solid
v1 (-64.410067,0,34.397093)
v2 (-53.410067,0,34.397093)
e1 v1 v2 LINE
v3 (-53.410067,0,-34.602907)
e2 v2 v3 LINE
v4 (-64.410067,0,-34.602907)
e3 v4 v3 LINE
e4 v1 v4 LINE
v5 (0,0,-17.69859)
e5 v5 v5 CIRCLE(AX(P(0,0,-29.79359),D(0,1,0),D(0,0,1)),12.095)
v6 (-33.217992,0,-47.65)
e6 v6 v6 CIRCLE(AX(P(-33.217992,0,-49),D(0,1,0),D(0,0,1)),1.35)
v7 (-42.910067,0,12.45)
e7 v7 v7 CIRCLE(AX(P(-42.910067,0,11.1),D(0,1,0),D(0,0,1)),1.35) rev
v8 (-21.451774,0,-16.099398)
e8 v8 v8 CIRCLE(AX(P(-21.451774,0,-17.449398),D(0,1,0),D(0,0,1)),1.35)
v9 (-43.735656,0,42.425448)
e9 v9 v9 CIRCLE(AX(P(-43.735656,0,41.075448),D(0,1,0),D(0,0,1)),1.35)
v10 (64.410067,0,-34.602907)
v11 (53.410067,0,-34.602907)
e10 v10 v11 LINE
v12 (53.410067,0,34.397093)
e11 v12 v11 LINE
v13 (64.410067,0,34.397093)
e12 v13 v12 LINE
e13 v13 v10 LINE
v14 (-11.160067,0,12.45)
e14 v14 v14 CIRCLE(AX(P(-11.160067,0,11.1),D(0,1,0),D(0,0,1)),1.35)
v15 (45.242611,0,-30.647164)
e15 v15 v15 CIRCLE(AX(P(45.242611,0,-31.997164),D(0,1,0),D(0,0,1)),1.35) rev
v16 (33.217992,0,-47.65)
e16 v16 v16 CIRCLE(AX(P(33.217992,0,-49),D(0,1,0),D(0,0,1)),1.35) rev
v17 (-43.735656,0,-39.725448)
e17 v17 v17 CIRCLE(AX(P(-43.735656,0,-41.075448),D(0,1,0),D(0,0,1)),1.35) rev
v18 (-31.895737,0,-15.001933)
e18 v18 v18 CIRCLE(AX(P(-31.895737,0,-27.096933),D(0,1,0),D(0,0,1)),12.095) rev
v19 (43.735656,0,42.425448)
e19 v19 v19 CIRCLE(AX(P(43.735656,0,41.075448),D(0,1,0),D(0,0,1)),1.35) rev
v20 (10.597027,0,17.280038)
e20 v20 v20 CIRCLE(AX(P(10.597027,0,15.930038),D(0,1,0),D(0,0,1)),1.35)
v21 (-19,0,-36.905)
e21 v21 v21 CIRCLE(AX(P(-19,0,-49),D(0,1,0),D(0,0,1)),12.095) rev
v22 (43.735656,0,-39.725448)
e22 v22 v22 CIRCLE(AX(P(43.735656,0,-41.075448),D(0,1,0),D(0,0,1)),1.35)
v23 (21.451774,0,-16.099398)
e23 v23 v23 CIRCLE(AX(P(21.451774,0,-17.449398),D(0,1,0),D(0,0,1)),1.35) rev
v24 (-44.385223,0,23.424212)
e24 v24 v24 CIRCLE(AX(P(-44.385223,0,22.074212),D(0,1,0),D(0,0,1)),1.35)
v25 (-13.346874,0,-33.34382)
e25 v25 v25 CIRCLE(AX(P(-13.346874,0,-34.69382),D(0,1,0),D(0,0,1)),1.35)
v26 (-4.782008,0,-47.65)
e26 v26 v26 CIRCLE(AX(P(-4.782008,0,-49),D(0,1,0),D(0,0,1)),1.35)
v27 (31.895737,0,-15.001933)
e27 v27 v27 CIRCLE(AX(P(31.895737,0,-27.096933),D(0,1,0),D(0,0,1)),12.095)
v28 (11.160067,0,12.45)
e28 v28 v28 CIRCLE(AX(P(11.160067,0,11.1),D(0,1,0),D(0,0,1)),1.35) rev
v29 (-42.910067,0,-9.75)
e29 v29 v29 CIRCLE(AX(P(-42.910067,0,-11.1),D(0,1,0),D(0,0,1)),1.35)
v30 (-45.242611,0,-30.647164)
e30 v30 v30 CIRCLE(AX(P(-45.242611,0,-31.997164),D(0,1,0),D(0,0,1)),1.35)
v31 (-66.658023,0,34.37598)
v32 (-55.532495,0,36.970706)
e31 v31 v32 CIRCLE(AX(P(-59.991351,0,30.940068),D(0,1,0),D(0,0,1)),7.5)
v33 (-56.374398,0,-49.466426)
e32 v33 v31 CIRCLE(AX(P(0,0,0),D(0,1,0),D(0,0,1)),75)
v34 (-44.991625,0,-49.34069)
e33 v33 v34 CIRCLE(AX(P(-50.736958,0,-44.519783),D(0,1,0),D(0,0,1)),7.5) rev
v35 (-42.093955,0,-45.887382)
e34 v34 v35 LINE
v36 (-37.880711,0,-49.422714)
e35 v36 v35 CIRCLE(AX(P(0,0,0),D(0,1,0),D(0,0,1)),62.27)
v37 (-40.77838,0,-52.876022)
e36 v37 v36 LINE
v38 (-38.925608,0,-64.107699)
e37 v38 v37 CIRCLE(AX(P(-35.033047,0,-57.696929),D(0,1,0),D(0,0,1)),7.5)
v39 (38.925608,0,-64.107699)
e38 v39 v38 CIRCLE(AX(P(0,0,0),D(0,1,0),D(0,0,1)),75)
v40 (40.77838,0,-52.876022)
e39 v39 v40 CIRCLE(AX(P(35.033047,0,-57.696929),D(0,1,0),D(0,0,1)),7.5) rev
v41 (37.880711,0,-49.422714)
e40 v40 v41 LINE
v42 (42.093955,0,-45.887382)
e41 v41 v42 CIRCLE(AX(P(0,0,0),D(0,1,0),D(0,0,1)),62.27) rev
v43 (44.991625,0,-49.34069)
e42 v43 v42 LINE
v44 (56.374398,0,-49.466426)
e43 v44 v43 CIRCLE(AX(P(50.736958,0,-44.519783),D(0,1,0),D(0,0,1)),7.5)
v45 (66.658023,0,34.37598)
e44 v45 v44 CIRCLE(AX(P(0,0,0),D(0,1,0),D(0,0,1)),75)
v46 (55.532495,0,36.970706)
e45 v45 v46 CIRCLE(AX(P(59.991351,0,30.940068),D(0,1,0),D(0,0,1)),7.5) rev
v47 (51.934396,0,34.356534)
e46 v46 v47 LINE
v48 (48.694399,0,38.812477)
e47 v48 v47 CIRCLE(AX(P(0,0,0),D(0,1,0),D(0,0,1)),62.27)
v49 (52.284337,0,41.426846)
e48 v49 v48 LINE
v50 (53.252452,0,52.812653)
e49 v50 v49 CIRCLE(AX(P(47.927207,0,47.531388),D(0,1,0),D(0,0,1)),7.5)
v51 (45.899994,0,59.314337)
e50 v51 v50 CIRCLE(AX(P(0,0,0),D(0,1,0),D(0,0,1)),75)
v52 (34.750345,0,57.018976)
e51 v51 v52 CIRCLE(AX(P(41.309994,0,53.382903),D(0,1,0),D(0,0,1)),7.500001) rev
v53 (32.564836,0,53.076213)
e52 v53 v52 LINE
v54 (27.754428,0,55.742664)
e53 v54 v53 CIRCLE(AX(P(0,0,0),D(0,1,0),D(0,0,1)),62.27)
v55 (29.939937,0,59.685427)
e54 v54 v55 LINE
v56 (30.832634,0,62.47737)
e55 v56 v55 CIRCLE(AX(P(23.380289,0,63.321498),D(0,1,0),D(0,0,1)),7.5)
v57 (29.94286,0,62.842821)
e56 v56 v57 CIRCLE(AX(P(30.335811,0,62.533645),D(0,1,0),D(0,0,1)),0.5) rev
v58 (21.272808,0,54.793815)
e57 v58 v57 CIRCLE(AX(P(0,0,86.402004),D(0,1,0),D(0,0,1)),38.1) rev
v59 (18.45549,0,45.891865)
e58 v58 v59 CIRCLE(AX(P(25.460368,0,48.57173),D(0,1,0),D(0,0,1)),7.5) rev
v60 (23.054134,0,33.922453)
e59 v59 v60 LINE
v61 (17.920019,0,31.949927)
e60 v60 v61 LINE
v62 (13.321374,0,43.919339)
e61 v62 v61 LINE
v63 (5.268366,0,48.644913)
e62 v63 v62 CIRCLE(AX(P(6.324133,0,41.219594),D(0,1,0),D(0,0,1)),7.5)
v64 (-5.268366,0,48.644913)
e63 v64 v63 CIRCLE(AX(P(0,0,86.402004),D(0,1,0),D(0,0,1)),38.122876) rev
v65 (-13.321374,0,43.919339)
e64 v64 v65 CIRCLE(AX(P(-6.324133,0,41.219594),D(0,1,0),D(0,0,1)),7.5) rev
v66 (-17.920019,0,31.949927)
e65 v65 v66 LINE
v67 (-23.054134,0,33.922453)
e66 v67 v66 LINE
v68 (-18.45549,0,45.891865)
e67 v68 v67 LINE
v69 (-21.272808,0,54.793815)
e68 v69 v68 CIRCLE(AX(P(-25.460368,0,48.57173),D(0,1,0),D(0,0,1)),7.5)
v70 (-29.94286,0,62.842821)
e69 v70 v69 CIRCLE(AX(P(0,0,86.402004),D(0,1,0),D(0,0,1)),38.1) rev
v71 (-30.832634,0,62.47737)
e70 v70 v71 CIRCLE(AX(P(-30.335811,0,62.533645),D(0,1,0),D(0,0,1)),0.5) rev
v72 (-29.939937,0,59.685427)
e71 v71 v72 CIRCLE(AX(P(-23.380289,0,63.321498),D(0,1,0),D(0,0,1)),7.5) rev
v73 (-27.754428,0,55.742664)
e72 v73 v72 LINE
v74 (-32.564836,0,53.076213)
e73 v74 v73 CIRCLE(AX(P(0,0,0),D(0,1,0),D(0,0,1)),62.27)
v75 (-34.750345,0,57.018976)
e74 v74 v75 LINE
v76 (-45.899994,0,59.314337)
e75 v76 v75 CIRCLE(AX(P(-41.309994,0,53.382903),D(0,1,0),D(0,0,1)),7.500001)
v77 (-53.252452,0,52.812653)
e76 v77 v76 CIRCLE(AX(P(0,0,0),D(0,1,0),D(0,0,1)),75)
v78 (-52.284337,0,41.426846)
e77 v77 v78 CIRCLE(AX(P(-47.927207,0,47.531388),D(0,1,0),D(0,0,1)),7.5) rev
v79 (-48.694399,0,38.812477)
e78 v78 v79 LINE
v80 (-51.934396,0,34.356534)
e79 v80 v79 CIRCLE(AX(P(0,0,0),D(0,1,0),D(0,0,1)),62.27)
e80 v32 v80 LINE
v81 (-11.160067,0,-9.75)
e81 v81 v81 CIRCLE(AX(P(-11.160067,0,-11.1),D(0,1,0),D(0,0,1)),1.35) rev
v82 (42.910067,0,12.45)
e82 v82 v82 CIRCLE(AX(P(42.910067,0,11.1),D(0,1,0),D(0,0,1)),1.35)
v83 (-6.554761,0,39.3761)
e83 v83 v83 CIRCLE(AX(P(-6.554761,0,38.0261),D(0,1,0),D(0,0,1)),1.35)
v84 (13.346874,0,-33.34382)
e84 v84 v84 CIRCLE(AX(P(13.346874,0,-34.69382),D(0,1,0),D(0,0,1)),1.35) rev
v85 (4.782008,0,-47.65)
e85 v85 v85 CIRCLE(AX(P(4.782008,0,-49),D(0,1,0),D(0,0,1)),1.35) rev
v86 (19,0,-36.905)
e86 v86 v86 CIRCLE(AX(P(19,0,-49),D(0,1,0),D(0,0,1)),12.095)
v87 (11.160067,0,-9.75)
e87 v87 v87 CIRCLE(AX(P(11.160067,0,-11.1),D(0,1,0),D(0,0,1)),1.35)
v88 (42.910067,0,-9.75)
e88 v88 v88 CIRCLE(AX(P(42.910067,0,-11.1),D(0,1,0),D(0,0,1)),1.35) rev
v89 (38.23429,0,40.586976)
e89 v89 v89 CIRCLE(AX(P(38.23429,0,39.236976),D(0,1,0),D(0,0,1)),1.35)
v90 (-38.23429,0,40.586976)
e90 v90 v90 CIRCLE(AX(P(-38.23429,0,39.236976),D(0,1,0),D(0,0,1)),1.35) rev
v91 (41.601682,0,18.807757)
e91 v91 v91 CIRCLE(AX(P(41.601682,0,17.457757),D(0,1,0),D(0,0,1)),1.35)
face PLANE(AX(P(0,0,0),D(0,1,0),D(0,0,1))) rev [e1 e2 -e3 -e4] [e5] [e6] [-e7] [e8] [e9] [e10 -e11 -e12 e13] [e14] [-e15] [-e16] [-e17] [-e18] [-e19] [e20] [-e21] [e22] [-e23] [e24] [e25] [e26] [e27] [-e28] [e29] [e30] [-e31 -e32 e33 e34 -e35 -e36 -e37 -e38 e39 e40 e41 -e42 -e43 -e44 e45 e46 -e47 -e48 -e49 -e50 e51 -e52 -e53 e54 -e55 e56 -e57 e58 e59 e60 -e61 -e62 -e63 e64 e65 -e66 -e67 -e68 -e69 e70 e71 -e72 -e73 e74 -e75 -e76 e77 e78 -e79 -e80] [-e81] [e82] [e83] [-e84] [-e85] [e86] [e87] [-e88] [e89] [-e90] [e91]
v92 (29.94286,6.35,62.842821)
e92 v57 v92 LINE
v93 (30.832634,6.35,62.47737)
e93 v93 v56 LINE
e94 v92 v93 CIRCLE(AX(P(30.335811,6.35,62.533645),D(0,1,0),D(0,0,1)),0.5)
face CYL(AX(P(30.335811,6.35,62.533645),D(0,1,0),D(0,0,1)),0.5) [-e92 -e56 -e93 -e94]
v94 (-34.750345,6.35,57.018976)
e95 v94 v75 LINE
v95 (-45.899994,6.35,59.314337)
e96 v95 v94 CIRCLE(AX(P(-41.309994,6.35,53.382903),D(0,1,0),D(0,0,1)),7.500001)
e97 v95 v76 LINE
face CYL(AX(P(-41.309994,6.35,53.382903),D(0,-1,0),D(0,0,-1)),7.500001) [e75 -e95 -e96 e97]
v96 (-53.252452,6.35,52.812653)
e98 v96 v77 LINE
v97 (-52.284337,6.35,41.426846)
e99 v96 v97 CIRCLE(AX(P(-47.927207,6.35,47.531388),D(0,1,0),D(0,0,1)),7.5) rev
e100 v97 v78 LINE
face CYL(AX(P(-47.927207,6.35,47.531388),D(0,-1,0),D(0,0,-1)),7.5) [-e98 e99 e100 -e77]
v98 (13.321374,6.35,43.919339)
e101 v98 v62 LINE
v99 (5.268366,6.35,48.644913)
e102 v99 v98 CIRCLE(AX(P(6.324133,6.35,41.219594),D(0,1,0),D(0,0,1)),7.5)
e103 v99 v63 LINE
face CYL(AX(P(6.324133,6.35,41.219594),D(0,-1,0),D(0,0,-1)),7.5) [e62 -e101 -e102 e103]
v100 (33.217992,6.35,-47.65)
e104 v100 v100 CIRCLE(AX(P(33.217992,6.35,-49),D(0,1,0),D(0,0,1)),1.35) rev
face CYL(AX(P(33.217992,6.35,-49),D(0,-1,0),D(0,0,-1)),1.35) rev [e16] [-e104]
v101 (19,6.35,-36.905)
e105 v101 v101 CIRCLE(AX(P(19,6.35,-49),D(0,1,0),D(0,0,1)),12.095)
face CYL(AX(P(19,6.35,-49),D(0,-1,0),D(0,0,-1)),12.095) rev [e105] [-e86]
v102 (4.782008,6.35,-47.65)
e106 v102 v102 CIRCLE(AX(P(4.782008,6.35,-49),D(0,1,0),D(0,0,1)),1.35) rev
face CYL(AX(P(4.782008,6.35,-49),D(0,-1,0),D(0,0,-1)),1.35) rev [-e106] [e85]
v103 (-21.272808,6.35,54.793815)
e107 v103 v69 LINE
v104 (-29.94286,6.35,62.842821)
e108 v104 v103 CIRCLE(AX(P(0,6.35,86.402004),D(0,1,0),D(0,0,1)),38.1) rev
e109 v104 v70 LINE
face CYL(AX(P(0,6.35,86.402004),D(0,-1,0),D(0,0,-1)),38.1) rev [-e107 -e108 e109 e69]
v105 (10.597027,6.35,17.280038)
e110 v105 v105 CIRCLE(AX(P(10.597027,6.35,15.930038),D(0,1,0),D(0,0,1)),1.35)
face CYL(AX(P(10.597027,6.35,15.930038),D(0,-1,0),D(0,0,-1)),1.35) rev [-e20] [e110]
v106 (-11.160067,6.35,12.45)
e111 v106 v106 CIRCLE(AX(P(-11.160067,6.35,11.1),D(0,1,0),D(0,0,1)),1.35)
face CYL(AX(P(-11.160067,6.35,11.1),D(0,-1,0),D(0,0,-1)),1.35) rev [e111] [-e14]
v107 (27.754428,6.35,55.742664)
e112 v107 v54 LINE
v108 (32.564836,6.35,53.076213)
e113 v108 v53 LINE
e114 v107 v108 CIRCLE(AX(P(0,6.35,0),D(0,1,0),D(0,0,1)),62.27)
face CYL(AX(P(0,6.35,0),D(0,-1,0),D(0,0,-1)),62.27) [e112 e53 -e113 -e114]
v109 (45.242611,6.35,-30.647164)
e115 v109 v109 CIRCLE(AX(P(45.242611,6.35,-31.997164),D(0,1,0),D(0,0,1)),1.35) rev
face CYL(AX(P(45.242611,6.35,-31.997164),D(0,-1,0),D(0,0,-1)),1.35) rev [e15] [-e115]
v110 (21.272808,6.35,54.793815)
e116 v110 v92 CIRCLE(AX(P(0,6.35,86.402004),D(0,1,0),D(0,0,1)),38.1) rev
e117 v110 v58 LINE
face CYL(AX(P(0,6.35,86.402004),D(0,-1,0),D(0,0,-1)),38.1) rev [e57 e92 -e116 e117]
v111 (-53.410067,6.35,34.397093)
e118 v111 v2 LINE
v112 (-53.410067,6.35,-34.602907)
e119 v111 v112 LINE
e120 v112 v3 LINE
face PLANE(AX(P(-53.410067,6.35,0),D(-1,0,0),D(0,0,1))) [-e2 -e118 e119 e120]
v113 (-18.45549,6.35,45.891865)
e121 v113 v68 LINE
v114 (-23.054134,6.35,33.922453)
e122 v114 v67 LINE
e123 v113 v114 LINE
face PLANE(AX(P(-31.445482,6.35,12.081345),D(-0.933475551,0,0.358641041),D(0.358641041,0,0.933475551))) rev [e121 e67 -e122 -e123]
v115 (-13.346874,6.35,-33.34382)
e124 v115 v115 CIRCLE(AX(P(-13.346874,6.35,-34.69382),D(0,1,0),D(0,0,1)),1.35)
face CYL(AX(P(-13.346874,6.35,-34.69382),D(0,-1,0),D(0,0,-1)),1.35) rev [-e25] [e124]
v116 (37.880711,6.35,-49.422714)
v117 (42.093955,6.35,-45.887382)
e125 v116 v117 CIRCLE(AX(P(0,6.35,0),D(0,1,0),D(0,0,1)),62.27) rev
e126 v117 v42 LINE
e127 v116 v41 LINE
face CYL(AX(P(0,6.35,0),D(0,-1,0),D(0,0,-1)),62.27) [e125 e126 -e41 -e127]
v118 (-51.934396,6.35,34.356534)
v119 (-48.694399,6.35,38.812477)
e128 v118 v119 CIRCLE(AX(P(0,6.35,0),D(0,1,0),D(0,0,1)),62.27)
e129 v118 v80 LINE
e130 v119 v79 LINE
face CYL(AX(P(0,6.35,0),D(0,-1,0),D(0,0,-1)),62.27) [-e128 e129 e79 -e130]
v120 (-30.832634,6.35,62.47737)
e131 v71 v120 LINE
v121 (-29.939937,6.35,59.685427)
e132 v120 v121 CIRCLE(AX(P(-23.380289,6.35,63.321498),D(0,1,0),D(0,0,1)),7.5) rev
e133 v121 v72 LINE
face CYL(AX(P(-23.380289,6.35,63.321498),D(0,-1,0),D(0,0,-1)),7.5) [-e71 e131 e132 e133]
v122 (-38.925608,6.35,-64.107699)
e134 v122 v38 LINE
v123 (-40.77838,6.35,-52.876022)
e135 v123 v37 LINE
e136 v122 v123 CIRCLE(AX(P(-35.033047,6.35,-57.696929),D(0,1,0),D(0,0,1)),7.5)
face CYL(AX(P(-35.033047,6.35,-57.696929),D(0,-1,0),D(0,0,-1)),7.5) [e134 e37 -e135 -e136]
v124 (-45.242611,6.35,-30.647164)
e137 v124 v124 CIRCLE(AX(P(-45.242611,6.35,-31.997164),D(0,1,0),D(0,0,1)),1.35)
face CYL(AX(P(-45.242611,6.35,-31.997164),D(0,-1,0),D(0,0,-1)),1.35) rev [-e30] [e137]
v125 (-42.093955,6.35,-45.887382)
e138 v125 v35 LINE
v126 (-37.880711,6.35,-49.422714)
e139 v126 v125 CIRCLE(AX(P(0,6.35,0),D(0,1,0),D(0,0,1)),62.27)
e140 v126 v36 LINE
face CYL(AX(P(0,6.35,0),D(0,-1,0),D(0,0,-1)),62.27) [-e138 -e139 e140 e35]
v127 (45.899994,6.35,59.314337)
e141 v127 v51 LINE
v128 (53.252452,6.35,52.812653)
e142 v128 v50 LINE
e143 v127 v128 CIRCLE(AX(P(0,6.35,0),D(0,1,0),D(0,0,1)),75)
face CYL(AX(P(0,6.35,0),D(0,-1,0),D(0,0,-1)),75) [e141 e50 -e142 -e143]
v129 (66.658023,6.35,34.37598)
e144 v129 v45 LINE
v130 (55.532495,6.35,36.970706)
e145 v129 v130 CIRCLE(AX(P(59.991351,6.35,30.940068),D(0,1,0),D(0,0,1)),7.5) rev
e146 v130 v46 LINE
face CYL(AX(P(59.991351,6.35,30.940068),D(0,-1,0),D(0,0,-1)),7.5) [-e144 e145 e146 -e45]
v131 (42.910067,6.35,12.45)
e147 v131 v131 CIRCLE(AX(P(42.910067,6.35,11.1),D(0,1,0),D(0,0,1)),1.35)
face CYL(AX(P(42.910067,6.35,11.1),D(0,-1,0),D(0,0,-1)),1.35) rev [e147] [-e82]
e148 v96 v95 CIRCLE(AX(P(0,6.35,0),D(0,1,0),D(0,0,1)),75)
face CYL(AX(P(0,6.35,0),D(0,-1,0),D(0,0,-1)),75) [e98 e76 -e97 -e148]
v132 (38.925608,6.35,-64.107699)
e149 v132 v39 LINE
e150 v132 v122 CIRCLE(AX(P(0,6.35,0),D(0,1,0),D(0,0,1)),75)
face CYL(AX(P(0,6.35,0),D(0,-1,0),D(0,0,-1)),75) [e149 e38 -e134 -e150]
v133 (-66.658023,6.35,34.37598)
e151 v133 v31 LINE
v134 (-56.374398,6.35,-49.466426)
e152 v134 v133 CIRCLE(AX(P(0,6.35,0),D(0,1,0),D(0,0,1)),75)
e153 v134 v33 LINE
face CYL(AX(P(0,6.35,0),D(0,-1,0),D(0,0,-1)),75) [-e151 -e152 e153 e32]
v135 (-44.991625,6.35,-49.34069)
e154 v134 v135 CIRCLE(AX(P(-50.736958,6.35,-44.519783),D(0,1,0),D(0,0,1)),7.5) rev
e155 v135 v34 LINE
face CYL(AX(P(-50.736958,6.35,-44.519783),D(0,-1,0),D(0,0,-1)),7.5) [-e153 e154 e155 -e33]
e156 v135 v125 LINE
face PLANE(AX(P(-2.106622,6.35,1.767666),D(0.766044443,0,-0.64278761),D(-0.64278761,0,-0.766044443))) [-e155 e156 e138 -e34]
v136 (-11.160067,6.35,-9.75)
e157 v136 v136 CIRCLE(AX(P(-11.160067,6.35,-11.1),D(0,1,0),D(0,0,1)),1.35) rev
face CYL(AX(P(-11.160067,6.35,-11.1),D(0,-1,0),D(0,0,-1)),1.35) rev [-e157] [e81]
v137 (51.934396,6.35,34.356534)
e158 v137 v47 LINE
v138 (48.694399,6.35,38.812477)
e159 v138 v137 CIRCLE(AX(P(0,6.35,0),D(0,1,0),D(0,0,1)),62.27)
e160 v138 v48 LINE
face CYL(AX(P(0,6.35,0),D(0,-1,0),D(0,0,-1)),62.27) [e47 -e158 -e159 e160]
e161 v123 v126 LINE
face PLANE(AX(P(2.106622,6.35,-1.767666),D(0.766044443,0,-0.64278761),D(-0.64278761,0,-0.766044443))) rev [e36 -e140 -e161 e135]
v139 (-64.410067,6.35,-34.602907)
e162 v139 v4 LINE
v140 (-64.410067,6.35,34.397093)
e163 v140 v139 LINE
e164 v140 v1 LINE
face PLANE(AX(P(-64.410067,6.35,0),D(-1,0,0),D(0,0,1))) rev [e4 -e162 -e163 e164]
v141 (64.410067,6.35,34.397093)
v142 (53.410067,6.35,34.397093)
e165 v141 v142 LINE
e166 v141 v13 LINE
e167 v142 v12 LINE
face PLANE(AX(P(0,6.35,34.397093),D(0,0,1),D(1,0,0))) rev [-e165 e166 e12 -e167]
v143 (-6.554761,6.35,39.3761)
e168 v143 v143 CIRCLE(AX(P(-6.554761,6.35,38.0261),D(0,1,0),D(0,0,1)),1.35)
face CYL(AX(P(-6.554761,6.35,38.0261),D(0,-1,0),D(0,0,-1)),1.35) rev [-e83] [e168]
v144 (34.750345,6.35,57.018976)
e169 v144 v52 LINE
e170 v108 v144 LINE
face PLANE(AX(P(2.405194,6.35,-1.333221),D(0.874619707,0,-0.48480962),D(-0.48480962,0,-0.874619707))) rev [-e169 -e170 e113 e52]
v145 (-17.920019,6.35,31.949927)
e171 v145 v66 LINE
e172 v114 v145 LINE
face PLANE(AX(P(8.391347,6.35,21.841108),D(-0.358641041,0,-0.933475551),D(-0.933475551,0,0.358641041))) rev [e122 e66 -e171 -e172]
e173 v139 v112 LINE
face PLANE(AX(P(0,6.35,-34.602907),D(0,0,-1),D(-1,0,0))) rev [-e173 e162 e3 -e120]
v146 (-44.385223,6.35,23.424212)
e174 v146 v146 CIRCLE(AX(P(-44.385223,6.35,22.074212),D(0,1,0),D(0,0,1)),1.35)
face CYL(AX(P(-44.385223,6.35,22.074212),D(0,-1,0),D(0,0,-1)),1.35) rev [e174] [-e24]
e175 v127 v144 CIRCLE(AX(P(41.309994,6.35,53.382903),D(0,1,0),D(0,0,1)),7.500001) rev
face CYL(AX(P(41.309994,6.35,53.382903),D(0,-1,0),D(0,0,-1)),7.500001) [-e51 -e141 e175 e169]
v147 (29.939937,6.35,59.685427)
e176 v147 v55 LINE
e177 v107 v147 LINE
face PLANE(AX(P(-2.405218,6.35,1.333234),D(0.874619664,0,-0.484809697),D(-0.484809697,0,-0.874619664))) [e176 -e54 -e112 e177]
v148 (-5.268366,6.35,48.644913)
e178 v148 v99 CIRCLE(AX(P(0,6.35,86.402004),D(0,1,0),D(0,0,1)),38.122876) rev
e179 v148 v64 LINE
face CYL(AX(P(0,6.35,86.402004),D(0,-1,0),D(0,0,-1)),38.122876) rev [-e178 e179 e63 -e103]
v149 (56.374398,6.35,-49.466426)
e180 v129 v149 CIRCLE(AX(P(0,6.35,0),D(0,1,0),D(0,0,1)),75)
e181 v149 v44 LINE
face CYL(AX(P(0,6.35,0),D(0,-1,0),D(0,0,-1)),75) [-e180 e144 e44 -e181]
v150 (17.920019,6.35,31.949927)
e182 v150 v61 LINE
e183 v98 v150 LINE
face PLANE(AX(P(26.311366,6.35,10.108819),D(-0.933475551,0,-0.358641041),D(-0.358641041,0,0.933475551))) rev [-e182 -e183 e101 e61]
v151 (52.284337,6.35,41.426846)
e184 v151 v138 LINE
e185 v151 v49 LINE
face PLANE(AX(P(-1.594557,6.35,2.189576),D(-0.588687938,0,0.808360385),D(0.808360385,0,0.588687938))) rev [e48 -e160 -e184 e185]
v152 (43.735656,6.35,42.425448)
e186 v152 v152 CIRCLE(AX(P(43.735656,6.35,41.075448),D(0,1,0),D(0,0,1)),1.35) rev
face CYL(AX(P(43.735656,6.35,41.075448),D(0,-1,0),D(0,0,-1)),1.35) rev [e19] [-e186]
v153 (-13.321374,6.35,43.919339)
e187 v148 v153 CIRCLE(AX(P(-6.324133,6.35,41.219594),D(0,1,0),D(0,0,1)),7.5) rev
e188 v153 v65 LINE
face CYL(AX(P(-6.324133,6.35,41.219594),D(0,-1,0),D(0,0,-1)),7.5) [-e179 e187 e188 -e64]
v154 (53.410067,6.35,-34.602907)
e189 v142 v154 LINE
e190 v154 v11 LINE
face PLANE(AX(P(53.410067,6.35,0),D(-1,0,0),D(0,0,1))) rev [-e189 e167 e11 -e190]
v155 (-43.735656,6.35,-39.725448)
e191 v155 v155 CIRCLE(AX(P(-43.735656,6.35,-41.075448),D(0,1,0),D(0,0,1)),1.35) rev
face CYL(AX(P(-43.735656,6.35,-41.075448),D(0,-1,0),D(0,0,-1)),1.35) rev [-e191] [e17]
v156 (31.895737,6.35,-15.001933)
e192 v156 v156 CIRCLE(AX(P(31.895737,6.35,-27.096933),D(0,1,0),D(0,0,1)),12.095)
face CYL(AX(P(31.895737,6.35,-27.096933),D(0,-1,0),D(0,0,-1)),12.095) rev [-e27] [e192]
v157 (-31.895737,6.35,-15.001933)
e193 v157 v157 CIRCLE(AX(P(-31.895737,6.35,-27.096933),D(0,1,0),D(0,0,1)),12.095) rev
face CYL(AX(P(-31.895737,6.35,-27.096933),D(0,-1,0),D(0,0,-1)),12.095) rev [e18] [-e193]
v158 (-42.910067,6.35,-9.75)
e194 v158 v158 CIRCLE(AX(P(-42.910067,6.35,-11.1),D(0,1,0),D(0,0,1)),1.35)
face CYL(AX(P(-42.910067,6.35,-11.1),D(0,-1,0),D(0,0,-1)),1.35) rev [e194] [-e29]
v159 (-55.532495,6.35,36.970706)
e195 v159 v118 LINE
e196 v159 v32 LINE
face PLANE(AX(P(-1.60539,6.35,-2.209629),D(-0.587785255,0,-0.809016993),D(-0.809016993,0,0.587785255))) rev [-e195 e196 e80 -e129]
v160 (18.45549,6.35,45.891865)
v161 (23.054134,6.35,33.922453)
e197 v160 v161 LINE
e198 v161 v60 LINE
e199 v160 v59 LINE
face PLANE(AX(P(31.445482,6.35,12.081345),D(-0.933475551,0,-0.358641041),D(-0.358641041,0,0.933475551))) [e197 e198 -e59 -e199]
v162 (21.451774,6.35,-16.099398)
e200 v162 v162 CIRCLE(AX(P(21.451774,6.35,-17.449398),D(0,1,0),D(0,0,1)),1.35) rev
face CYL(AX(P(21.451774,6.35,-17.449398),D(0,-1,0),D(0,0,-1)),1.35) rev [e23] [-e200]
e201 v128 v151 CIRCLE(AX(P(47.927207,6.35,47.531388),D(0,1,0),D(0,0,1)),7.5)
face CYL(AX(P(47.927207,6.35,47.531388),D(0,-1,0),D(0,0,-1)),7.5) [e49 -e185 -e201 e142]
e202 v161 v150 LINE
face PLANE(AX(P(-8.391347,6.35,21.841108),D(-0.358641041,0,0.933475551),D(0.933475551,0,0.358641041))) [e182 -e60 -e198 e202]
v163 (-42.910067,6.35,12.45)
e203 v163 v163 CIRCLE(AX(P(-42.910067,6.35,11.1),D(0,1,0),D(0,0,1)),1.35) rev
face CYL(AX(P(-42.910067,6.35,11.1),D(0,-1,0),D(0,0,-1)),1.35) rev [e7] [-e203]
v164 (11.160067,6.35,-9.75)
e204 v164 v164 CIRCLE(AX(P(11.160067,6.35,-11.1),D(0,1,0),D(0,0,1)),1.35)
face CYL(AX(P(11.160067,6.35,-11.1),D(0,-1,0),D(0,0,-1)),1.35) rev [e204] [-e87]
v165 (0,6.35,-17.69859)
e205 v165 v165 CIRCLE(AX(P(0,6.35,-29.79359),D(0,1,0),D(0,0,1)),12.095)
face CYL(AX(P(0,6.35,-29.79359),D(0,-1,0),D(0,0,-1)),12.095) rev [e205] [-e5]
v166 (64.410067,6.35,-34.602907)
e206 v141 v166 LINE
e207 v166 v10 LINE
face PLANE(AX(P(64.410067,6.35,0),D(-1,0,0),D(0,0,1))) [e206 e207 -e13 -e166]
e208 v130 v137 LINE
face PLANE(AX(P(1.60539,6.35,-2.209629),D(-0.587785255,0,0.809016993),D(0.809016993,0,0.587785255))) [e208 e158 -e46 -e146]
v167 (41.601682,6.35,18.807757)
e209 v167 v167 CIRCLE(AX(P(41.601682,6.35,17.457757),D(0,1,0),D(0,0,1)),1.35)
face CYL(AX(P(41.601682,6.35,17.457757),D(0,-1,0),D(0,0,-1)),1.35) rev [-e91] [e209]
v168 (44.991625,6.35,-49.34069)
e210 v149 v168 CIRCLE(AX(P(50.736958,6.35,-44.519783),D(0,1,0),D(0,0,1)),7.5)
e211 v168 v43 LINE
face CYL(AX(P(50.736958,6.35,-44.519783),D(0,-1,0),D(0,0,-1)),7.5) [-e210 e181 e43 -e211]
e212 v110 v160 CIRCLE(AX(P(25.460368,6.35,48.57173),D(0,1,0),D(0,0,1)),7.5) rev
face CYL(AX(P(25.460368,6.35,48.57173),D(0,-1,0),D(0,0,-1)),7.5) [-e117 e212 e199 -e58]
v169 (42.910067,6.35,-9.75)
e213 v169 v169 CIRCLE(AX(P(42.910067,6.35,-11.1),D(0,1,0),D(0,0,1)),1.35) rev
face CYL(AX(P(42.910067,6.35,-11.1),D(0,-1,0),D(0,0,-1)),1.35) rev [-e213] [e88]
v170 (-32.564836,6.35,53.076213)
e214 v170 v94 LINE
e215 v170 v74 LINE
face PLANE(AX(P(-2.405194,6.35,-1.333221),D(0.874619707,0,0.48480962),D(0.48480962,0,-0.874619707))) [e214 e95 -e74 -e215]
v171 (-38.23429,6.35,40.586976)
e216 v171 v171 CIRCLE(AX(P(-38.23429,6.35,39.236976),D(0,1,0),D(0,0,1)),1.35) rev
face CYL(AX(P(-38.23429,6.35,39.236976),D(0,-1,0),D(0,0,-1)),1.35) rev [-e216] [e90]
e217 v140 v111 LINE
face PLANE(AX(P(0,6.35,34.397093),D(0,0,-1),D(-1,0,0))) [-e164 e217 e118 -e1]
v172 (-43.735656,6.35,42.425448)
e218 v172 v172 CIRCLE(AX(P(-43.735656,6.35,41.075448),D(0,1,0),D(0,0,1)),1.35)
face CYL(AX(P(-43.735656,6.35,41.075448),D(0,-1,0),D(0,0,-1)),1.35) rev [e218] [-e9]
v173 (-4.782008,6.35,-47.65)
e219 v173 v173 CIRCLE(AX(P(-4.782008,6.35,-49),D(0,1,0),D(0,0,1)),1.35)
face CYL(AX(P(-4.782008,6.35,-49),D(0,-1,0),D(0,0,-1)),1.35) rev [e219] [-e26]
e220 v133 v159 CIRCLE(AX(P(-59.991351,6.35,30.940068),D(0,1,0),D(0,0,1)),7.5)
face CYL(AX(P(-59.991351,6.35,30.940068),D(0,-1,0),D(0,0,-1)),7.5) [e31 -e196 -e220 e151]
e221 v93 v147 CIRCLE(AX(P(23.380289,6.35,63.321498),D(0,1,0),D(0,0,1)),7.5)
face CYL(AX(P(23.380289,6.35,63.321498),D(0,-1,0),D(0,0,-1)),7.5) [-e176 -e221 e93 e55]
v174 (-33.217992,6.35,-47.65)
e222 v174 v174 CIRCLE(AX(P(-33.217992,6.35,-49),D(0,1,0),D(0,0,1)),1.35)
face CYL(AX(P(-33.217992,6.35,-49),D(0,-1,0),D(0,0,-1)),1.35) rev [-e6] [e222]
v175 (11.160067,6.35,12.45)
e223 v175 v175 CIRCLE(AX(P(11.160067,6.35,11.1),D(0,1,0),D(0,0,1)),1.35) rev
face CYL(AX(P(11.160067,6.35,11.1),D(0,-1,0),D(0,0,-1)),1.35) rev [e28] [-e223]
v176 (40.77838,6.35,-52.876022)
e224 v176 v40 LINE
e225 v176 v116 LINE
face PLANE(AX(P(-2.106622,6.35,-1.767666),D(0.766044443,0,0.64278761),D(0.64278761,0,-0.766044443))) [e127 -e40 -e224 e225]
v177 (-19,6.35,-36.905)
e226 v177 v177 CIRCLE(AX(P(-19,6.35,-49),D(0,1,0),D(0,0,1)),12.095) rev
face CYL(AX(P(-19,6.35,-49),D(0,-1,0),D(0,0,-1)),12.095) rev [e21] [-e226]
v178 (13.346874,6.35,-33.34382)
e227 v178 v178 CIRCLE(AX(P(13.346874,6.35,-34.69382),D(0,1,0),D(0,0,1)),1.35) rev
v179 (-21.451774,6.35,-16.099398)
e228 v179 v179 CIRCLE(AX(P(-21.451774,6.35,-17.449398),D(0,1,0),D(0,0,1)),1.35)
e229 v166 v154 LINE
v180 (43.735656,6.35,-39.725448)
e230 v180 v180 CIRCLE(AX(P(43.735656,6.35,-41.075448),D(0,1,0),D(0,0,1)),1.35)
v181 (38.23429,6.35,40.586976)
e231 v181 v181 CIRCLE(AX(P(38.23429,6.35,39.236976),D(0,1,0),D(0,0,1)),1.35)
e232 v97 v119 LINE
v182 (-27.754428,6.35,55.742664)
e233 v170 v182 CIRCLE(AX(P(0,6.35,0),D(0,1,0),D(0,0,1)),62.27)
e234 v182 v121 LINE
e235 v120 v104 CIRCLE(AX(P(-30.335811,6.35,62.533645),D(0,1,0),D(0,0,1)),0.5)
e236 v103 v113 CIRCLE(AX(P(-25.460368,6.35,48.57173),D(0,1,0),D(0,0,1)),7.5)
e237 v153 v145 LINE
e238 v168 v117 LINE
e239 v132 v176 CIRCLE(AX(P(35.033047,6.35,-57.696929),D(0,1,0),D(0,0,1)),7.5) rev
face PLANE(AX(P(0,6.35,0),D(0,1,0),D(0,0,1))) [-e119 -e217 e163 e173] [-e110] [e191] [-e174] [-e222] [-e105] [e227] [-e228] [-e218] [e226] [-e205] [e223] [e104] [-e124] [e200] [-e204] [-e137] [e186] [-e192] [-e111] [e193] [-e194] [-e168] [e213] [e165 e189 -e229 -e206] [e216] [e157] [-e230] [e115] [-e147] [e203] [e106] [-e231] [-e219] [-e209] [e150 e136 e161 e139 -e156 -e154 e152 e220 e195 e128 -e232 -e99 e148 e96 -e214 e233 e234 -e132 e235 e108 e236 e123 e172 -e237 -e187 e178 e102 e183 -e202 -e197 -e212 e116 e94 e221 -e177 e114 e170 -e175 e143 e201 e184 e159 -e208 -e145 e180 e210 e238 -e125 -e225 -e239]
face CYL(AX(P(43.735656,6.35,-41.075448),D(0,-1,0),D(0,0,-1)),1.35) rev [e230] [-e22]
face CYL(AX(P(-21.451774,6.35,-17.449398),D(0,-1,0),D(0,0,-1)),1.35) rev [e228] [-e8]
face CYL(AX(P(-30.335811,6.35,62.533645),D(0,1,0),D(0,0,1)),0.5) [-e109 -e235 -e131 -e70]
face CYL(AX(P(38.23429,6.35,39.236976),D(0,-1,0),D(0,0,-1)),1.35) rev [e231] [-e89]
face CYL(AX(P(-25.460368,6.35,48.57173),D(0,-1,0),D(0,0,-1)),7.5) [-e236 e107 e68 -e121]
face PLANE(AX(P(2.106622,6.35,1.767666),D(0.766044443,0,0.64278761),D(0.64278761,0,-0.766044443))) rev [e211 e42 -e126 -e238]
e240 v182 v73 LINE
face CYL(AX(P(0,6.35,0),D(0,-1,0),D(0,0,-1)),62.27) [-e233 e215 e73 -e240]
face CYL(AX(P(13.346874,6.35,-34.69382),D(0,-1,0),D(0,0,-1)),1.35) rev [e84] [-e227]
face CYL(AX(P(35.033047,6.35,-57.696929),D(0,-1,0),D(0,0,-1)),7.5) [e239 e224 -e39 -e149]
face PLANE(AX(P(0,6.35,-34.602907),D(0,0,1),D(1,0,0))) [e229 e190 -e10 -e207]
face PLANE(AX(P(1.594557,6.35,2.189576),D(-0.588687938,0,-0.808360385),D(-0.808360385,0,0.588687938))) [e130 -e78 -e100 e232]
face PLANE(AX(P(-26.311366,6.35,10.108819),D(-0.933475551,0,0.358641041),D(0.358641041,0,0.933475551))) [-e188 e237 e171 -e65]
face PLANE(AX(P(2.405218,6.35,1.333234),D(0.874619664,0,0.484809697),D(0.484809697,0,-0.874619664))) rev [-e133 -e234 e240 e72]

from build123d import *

# Parameters (mm, degrees)
BOSS_EXTRUDE3_OUTLINE_R   = 1.35
BOSS_EXTRUDE3_OUTLINE_W   = 11
BOSS_EXTRUDE3_OUTLINE_H   = 69
BOSS_EXTRUDE3_OUTLINE_R_2 = 12.095
BOSS_EXTRUDE3_DEPTH       = 6.35
FILLET5_R                 = 0.5


# Read off the part's stored shape, not the designer's step: Boss-Extrude3
with BuildPart() as part:
    # Boss-Extrude3 outline → Boss-Extrude3 (new body)
    with BuildSketch(Plane(origin=(0, 0, 0), x_dir=(1, 0, 0), z_dir=(0, 1, 0))):
        with BuildLine():
            ThreePointArc((30.845959646, -64.038266509), (30.722917613, -61.793165345), (29.939937248, -59.685427143))
            Line((29.939937248, -59.685427143), (27.754427747, -55.742664454))
            ThreePointArc((27.754427747, -55.742664454), (30.189085526, -54.462574444), (32.564835967, -53.076212737))
            Line((32.564835967, -53.076212737), (34.750345491, -57.018976288))
            ThreePointArc((34.750345491, -57.018976288), (39.797694407, -60.728851606), (45.899993549, -59.314337155))
            ThreePointArc((45.899993549, -59.314337155), (49.682691748, -56.183895741), (53.252452412, -52.812652955))
            ThreePointArc((53.252452412, -52.812652955), (55.400241506, -46.895968251), (52.284336639, -41.426846498))
            Line((52.284336639, -41.426846498), (48.694399386, -38.812476969))
            ThreePointArc((48.694399386, -38.812476969), (50.363701809, -36.620355543), (51.934395763, -34.35653412))
            Line((51.934395763, -34.35653412), (55.532494673, -36.970706015))
            ThreePointArc((55.532494673, -36.970706015), (61.694807292, -38.244055423), (66.658022594, -34.375979751))
            ThreePointArc((66.658022594, -34.375979751), (74.442134424, 9.130641951), (56.374397975, 49.466425512))
            ThreePointArc((56.374397975, 49.466425512), (50.654117331, 52.01932544), (44.991624855, 49.340690033))
            Line((44.991624855, 49.340690033), (42.093955335, 45.887381973))
            ThreePointArc((42.093955335, 45.887381973), (40.026384455, 47.701587473), (37.880710897, 49.422713826))
            Line((37.880710897, 49.422713826), (40.778380417, 52.876021886))
            ThreePointArc((40.778380417, 52.876021886), (42.433039833, 58.917628535), (38.925607882, 64.107698843))
            ThreePointArc((38.925607882, 64.107698843), (0, 75), (-38.925607882, 64.107698843))
            ThreePointArc((-38.925607882, 64.107698843), (-42.433039833, 58.917628535), (-40.778380417, 52.876021886))
            Line((-40.778380417, 52.876021886), (-37.880710897, 49.422713826))
            ThreePointArc((-37.880710897, 49.422713826), (-40.026384455, 47.701587473), (-42.093955335, 45.887381973))
            Line((-42.093955335, 45.887381973), (-44.991624855, 49.340690033))
            ThreePointArc((-44.991624855, 49.340690033), (-50.654117331, 52.01932544), (-56.374397975, 49.466425512))
            ThreePointArc((-56.374397975, 49.466425512), (-74.442134424, 9.130641951), (-66.658022831, -34.375979873))
            ThreePointArc((-66.658022831, -34.375979873), (-61.694807292, -38.244055423), (-55.532494673, -36.970706015))
            Line((-55.532494673, -36.970706015), (-51.934395763, -34.35653412))
            ThreePointArc((-51.934395763, -34.35653412), (-50.363701809, -36.620355543), (-48.694399386, -38.812476969))
            Line((-48.694399386, -38.812476969), (-52.284336639, -41.426846498))
            ThreePointArc((-52.284336639, -41.426846498), (-55.400241506, -46.895968251), (-53.252452412, -52.812652955))
            ThreePointArc((-53.252452412, -52.812652955), (-49.682691748, -56.183895741), (-45.899993549, -59.314337155))
            ThreePointArc((-45.899993549, -59.314337155), (-39.797694407, -60.728851606), (-34.750345491, -57.018976288))
            Line((-34.750345491, -57.018976288), (-32.564835967, -53.076212737))
            ThreePointArc((-32.564835967, -53.076212737), (-30.189085526, -54.462574444), (-27.754427747, -55.742664454))
            Line((-27.754427747, -55.742664454), (-29.939937248, -59.685427143))
            ThreePointArc((-29.939937248, -59.685427143), (-30.722917613, -61.793165345), (-30.845959646, -64.038266509))
            ThreePointArc((-30.845959646, -64.038266509), (-26.466137741, -58.99482374), (-21.272807595, -54.79381471))
            ThreePointArc((-21.272807595, -54.79381471), (-18.309924074, -50.834725832), (-18.455489673, -45.891864903))
            Line((-18.455489673, -45.891864903), (-23.054134296, -33.922453045))
            Line((-23.054134296, -33.922453045), (-17.920018766, -31.949927322))
            Line((-17.920018766, -31.949927322), (-13.321374143, -43.91933918))
            ThreePointArc((-13.321374143, -43.91933918), (-10.119925368, -47.688130663), (-5.268365652, -48.644912678))
            ThreePointArc((-5.268365652, -48.644912678), (0, -48.279128696), (5.268365652, -48.644912678))
            ThreePointArc((5.268365652, -48.644912678), (10.119925368, -47.688130663), (13.321374143, -43.91933918))
            Line((13.321374143, -43.91933918), (17.920018766, -31.949927322))
            Line((17.920018766, -31.949927322), (23.054134296, -33.922453045))
            Line((23.054134296, -33.922453045), (18.455489673, -45.891864903))
            ThreePointArc((18.455489673, -45.891864903), (18.309924074, -50.834725832), (21.272807595, -54.79381471))
            ThreePointArc((21.272807595, -54.79381471), (26.466137741, -58.99482374), (30.845959646, -64.038266509))
        make_face()
        with Locations((-43.735655662, -41.075447944)):
            Circle(BOSS_EXTRUDE3_OUTLINE_R, mode=Mode.SUBTRACT)
        with Locations((-38.234289702, -39.23697625)):
            Circle(BOSS_EXTRUDE3_OUTLINE_R, mode=Mode.SUBTRACT)
        with Locations((-6.55476095, -38.026099982)):
            Circle(BOSS_EXTRUDE3_OUTLINE_R, mode=Mode.SUBTRACT)
        with Locations((-44.385223141, -22.074211772)):
            Circle(BOSS_EXTRUDE3_OUTLINE_R, mode=Mode.SUBTRACT)
        with Locations((-58.910067426, 0.102907352)):
            Rectangle(BOSS_EXTRUDE3_OUTLINE_W, BOSS_EXTRUDE3_OUTLINE_H, mode=Mode.SUBTRACT)
        with Locations((-42.910067426, -11.1)):
            Circle(BOSS_EXTRUDE3_OUTLINE_R, mode=Mode.SUBTRACT)
        with Locations((-11.160067426, -11.1)):
            Circle(BOSS_EXTRUDE3_OUTLINE_R, mode=Mode.SUBTRACT)
        with Locations((38.234289702, -39.23697625)):
            Circle(BOSS_EXTRUDE3_OUTLINE_R, mode=Mode.SUBTRACT)
        with Locations((43.735655662, -41.075447944)):
            Circle(BOSS_EXTRUDE3_OUTLINE_R, mode=Mode.SUBTRACT)
        with Locations((10.597026674, -15.930038136)):
            Circle(BOSS_EXTRUDE3_OUTLINE_R, mode=Mode.SUBTRACT)
        with Locations((11.160067426, -11.1)):
            Circle(BOSS_EXTRUDE3_OUTLINE_R, mode=Mode.SUBTRACT)
        with Locations((41.601681906, -17.457756634)):
            Circle(BOSS_EXTRUDE3_OUTLINE_R, mode=Mode.SUBTRACT)
        with Locations((42.910067426, -11.1)):
            Circle(BOSS_EXTRUDE3_OUTLINE_R, mode=Mode.SUBTRACT)
        with Locations((58.910067426, 0.102907352)):
            Rectangle(BOSS_EXTRUDE3_OUTLINE_W, BOSS_EXTRUDE3_OUTLINE_H, mode=Mode.SUBTRACT)
        with Locations((-42.910067426, 11.1)):
            Circle(BOSS_EXTRUDE3_OUTLINE_R, mode=Mode.SUBTRACT)
        with Locations((-45.242610731, 31.997163897)):
            Circle(BOSS_EXTRUDE3_OUTLINE_R, mode=Mode.SUBTRACT)
        with Locations((-21.451773633, 17.449398418)):
            Circle(BOSS_EXTRUDE3_OUTLINE_R, mode=Mode.SUBTRACT)
        with Locations((-11.160067426, 11.1)):
            Circle(BOSS_EXTRUDE3_OUTLINE_R, mode=Mode.SUBTRACT)
        with Locations((-31.895736851, 27.096933482)):
            Circle(BOSS_EXTRUDE3_OUTLINE_R_2, mode=Mode.SUBTRACT)
        with Locations((-13.346873881, 34.693819966)):
            Circle(BOSS_EXTRUDE3_OUTLINE_R, mode=Mode.SUBTRACT)
        with Locations((-43.735655662, 41.075447944)):
            Circle(BOSS_EXTRUDE3_OUTLINE_R, mode=Mode.SUBTRACT)
        with Locations((-33.21799214, 49)):
            Circle(BOSS_EXTRUDE3_OUTLINE_R, mode=Mode.SUBTRACT)
        with Locations((-19, 49)):
            Circle(BOSS_EXTRUDE3_OUTLINE_R_2, mode=Mode.SUBTRACT)
        with Locations((-4.78200786, 49)):
            Circle(BOSS_EXTRUDE3_OUTLINE_R, mode=Mode.SUBTRACT)
        with Locations((11.160067426, 11.1)):
            Circle(BOSS_EXTRUDE3_OUTLINE_R, mode=Mode.SUBTRACT)
        with Locations((21.451773633, 17.449398418)):
            Circle(BOSS_EXTRUDE3_OUTLINE_R, mode=Mode.SUBTRACT)
        with Locations((0, 29.793589551)):
            Circle(BOSS_EXTRUDE3_OUTLINE_R_2, mode=Mode.SUBTRACT)
        with Locations((13.346873881, 34.693819966)):
            Circle(BOSS_EXTRUDE3_OUTLINE_R, mode=Mode.SUBTRACT)
        with Locations((31.895736851, 27.096933482)):
            Circle(BOSS_EXTRUDE3_OUTLINE_R_2, mode=Mode.SUBTRACT)
        with Locations((42.910067426, 11.1)):
            Circle(BOSS_EXTRUDE3_OUTLINE_R, mode=Mode.SUBTRACT)
        with Locations((45.242610731, 31.997163897)):
            Circle(BOSS_EXTRUDE3_OUTLINE_R, mode=Mode.SUBTRACT)
        with Locations((4.78200786, 49)):
            Circle(BOSS_EXTRUDE3_OUTLINE_R, mode=Mode.SUBTRACT)
        with Locations((19, 49)):
            Circle(BOSS_EXTRUDE3_OUTLINE_R_2, mode=Mode.SUBTRACT)
        with Locations((33.21799214, 49)):
            Circle(BOSS_EXTRUDE3_OUTLINE_R, mode=Mode.SUBTRACT)
        with Locations((43.735655662, 41.075447944)):
            Circle(BOSS_EXTRUDE3_OUTLINE_R, mode=Mode.SUBTRACT)
    extrude(amount=BOSS_EXTRUDE3_DEPTH)

    # Fillet5
    fillet5_edges = [part.edges().sort_by_distance(p)[0] for p in [
        (30.845959646, 3.175, 64.038266509),
        (-30.845959646, 3.175, 64.038266509),
    ]]
    fillet(fillet5_edges, radius=FILLET5_R)


solid = part.part
